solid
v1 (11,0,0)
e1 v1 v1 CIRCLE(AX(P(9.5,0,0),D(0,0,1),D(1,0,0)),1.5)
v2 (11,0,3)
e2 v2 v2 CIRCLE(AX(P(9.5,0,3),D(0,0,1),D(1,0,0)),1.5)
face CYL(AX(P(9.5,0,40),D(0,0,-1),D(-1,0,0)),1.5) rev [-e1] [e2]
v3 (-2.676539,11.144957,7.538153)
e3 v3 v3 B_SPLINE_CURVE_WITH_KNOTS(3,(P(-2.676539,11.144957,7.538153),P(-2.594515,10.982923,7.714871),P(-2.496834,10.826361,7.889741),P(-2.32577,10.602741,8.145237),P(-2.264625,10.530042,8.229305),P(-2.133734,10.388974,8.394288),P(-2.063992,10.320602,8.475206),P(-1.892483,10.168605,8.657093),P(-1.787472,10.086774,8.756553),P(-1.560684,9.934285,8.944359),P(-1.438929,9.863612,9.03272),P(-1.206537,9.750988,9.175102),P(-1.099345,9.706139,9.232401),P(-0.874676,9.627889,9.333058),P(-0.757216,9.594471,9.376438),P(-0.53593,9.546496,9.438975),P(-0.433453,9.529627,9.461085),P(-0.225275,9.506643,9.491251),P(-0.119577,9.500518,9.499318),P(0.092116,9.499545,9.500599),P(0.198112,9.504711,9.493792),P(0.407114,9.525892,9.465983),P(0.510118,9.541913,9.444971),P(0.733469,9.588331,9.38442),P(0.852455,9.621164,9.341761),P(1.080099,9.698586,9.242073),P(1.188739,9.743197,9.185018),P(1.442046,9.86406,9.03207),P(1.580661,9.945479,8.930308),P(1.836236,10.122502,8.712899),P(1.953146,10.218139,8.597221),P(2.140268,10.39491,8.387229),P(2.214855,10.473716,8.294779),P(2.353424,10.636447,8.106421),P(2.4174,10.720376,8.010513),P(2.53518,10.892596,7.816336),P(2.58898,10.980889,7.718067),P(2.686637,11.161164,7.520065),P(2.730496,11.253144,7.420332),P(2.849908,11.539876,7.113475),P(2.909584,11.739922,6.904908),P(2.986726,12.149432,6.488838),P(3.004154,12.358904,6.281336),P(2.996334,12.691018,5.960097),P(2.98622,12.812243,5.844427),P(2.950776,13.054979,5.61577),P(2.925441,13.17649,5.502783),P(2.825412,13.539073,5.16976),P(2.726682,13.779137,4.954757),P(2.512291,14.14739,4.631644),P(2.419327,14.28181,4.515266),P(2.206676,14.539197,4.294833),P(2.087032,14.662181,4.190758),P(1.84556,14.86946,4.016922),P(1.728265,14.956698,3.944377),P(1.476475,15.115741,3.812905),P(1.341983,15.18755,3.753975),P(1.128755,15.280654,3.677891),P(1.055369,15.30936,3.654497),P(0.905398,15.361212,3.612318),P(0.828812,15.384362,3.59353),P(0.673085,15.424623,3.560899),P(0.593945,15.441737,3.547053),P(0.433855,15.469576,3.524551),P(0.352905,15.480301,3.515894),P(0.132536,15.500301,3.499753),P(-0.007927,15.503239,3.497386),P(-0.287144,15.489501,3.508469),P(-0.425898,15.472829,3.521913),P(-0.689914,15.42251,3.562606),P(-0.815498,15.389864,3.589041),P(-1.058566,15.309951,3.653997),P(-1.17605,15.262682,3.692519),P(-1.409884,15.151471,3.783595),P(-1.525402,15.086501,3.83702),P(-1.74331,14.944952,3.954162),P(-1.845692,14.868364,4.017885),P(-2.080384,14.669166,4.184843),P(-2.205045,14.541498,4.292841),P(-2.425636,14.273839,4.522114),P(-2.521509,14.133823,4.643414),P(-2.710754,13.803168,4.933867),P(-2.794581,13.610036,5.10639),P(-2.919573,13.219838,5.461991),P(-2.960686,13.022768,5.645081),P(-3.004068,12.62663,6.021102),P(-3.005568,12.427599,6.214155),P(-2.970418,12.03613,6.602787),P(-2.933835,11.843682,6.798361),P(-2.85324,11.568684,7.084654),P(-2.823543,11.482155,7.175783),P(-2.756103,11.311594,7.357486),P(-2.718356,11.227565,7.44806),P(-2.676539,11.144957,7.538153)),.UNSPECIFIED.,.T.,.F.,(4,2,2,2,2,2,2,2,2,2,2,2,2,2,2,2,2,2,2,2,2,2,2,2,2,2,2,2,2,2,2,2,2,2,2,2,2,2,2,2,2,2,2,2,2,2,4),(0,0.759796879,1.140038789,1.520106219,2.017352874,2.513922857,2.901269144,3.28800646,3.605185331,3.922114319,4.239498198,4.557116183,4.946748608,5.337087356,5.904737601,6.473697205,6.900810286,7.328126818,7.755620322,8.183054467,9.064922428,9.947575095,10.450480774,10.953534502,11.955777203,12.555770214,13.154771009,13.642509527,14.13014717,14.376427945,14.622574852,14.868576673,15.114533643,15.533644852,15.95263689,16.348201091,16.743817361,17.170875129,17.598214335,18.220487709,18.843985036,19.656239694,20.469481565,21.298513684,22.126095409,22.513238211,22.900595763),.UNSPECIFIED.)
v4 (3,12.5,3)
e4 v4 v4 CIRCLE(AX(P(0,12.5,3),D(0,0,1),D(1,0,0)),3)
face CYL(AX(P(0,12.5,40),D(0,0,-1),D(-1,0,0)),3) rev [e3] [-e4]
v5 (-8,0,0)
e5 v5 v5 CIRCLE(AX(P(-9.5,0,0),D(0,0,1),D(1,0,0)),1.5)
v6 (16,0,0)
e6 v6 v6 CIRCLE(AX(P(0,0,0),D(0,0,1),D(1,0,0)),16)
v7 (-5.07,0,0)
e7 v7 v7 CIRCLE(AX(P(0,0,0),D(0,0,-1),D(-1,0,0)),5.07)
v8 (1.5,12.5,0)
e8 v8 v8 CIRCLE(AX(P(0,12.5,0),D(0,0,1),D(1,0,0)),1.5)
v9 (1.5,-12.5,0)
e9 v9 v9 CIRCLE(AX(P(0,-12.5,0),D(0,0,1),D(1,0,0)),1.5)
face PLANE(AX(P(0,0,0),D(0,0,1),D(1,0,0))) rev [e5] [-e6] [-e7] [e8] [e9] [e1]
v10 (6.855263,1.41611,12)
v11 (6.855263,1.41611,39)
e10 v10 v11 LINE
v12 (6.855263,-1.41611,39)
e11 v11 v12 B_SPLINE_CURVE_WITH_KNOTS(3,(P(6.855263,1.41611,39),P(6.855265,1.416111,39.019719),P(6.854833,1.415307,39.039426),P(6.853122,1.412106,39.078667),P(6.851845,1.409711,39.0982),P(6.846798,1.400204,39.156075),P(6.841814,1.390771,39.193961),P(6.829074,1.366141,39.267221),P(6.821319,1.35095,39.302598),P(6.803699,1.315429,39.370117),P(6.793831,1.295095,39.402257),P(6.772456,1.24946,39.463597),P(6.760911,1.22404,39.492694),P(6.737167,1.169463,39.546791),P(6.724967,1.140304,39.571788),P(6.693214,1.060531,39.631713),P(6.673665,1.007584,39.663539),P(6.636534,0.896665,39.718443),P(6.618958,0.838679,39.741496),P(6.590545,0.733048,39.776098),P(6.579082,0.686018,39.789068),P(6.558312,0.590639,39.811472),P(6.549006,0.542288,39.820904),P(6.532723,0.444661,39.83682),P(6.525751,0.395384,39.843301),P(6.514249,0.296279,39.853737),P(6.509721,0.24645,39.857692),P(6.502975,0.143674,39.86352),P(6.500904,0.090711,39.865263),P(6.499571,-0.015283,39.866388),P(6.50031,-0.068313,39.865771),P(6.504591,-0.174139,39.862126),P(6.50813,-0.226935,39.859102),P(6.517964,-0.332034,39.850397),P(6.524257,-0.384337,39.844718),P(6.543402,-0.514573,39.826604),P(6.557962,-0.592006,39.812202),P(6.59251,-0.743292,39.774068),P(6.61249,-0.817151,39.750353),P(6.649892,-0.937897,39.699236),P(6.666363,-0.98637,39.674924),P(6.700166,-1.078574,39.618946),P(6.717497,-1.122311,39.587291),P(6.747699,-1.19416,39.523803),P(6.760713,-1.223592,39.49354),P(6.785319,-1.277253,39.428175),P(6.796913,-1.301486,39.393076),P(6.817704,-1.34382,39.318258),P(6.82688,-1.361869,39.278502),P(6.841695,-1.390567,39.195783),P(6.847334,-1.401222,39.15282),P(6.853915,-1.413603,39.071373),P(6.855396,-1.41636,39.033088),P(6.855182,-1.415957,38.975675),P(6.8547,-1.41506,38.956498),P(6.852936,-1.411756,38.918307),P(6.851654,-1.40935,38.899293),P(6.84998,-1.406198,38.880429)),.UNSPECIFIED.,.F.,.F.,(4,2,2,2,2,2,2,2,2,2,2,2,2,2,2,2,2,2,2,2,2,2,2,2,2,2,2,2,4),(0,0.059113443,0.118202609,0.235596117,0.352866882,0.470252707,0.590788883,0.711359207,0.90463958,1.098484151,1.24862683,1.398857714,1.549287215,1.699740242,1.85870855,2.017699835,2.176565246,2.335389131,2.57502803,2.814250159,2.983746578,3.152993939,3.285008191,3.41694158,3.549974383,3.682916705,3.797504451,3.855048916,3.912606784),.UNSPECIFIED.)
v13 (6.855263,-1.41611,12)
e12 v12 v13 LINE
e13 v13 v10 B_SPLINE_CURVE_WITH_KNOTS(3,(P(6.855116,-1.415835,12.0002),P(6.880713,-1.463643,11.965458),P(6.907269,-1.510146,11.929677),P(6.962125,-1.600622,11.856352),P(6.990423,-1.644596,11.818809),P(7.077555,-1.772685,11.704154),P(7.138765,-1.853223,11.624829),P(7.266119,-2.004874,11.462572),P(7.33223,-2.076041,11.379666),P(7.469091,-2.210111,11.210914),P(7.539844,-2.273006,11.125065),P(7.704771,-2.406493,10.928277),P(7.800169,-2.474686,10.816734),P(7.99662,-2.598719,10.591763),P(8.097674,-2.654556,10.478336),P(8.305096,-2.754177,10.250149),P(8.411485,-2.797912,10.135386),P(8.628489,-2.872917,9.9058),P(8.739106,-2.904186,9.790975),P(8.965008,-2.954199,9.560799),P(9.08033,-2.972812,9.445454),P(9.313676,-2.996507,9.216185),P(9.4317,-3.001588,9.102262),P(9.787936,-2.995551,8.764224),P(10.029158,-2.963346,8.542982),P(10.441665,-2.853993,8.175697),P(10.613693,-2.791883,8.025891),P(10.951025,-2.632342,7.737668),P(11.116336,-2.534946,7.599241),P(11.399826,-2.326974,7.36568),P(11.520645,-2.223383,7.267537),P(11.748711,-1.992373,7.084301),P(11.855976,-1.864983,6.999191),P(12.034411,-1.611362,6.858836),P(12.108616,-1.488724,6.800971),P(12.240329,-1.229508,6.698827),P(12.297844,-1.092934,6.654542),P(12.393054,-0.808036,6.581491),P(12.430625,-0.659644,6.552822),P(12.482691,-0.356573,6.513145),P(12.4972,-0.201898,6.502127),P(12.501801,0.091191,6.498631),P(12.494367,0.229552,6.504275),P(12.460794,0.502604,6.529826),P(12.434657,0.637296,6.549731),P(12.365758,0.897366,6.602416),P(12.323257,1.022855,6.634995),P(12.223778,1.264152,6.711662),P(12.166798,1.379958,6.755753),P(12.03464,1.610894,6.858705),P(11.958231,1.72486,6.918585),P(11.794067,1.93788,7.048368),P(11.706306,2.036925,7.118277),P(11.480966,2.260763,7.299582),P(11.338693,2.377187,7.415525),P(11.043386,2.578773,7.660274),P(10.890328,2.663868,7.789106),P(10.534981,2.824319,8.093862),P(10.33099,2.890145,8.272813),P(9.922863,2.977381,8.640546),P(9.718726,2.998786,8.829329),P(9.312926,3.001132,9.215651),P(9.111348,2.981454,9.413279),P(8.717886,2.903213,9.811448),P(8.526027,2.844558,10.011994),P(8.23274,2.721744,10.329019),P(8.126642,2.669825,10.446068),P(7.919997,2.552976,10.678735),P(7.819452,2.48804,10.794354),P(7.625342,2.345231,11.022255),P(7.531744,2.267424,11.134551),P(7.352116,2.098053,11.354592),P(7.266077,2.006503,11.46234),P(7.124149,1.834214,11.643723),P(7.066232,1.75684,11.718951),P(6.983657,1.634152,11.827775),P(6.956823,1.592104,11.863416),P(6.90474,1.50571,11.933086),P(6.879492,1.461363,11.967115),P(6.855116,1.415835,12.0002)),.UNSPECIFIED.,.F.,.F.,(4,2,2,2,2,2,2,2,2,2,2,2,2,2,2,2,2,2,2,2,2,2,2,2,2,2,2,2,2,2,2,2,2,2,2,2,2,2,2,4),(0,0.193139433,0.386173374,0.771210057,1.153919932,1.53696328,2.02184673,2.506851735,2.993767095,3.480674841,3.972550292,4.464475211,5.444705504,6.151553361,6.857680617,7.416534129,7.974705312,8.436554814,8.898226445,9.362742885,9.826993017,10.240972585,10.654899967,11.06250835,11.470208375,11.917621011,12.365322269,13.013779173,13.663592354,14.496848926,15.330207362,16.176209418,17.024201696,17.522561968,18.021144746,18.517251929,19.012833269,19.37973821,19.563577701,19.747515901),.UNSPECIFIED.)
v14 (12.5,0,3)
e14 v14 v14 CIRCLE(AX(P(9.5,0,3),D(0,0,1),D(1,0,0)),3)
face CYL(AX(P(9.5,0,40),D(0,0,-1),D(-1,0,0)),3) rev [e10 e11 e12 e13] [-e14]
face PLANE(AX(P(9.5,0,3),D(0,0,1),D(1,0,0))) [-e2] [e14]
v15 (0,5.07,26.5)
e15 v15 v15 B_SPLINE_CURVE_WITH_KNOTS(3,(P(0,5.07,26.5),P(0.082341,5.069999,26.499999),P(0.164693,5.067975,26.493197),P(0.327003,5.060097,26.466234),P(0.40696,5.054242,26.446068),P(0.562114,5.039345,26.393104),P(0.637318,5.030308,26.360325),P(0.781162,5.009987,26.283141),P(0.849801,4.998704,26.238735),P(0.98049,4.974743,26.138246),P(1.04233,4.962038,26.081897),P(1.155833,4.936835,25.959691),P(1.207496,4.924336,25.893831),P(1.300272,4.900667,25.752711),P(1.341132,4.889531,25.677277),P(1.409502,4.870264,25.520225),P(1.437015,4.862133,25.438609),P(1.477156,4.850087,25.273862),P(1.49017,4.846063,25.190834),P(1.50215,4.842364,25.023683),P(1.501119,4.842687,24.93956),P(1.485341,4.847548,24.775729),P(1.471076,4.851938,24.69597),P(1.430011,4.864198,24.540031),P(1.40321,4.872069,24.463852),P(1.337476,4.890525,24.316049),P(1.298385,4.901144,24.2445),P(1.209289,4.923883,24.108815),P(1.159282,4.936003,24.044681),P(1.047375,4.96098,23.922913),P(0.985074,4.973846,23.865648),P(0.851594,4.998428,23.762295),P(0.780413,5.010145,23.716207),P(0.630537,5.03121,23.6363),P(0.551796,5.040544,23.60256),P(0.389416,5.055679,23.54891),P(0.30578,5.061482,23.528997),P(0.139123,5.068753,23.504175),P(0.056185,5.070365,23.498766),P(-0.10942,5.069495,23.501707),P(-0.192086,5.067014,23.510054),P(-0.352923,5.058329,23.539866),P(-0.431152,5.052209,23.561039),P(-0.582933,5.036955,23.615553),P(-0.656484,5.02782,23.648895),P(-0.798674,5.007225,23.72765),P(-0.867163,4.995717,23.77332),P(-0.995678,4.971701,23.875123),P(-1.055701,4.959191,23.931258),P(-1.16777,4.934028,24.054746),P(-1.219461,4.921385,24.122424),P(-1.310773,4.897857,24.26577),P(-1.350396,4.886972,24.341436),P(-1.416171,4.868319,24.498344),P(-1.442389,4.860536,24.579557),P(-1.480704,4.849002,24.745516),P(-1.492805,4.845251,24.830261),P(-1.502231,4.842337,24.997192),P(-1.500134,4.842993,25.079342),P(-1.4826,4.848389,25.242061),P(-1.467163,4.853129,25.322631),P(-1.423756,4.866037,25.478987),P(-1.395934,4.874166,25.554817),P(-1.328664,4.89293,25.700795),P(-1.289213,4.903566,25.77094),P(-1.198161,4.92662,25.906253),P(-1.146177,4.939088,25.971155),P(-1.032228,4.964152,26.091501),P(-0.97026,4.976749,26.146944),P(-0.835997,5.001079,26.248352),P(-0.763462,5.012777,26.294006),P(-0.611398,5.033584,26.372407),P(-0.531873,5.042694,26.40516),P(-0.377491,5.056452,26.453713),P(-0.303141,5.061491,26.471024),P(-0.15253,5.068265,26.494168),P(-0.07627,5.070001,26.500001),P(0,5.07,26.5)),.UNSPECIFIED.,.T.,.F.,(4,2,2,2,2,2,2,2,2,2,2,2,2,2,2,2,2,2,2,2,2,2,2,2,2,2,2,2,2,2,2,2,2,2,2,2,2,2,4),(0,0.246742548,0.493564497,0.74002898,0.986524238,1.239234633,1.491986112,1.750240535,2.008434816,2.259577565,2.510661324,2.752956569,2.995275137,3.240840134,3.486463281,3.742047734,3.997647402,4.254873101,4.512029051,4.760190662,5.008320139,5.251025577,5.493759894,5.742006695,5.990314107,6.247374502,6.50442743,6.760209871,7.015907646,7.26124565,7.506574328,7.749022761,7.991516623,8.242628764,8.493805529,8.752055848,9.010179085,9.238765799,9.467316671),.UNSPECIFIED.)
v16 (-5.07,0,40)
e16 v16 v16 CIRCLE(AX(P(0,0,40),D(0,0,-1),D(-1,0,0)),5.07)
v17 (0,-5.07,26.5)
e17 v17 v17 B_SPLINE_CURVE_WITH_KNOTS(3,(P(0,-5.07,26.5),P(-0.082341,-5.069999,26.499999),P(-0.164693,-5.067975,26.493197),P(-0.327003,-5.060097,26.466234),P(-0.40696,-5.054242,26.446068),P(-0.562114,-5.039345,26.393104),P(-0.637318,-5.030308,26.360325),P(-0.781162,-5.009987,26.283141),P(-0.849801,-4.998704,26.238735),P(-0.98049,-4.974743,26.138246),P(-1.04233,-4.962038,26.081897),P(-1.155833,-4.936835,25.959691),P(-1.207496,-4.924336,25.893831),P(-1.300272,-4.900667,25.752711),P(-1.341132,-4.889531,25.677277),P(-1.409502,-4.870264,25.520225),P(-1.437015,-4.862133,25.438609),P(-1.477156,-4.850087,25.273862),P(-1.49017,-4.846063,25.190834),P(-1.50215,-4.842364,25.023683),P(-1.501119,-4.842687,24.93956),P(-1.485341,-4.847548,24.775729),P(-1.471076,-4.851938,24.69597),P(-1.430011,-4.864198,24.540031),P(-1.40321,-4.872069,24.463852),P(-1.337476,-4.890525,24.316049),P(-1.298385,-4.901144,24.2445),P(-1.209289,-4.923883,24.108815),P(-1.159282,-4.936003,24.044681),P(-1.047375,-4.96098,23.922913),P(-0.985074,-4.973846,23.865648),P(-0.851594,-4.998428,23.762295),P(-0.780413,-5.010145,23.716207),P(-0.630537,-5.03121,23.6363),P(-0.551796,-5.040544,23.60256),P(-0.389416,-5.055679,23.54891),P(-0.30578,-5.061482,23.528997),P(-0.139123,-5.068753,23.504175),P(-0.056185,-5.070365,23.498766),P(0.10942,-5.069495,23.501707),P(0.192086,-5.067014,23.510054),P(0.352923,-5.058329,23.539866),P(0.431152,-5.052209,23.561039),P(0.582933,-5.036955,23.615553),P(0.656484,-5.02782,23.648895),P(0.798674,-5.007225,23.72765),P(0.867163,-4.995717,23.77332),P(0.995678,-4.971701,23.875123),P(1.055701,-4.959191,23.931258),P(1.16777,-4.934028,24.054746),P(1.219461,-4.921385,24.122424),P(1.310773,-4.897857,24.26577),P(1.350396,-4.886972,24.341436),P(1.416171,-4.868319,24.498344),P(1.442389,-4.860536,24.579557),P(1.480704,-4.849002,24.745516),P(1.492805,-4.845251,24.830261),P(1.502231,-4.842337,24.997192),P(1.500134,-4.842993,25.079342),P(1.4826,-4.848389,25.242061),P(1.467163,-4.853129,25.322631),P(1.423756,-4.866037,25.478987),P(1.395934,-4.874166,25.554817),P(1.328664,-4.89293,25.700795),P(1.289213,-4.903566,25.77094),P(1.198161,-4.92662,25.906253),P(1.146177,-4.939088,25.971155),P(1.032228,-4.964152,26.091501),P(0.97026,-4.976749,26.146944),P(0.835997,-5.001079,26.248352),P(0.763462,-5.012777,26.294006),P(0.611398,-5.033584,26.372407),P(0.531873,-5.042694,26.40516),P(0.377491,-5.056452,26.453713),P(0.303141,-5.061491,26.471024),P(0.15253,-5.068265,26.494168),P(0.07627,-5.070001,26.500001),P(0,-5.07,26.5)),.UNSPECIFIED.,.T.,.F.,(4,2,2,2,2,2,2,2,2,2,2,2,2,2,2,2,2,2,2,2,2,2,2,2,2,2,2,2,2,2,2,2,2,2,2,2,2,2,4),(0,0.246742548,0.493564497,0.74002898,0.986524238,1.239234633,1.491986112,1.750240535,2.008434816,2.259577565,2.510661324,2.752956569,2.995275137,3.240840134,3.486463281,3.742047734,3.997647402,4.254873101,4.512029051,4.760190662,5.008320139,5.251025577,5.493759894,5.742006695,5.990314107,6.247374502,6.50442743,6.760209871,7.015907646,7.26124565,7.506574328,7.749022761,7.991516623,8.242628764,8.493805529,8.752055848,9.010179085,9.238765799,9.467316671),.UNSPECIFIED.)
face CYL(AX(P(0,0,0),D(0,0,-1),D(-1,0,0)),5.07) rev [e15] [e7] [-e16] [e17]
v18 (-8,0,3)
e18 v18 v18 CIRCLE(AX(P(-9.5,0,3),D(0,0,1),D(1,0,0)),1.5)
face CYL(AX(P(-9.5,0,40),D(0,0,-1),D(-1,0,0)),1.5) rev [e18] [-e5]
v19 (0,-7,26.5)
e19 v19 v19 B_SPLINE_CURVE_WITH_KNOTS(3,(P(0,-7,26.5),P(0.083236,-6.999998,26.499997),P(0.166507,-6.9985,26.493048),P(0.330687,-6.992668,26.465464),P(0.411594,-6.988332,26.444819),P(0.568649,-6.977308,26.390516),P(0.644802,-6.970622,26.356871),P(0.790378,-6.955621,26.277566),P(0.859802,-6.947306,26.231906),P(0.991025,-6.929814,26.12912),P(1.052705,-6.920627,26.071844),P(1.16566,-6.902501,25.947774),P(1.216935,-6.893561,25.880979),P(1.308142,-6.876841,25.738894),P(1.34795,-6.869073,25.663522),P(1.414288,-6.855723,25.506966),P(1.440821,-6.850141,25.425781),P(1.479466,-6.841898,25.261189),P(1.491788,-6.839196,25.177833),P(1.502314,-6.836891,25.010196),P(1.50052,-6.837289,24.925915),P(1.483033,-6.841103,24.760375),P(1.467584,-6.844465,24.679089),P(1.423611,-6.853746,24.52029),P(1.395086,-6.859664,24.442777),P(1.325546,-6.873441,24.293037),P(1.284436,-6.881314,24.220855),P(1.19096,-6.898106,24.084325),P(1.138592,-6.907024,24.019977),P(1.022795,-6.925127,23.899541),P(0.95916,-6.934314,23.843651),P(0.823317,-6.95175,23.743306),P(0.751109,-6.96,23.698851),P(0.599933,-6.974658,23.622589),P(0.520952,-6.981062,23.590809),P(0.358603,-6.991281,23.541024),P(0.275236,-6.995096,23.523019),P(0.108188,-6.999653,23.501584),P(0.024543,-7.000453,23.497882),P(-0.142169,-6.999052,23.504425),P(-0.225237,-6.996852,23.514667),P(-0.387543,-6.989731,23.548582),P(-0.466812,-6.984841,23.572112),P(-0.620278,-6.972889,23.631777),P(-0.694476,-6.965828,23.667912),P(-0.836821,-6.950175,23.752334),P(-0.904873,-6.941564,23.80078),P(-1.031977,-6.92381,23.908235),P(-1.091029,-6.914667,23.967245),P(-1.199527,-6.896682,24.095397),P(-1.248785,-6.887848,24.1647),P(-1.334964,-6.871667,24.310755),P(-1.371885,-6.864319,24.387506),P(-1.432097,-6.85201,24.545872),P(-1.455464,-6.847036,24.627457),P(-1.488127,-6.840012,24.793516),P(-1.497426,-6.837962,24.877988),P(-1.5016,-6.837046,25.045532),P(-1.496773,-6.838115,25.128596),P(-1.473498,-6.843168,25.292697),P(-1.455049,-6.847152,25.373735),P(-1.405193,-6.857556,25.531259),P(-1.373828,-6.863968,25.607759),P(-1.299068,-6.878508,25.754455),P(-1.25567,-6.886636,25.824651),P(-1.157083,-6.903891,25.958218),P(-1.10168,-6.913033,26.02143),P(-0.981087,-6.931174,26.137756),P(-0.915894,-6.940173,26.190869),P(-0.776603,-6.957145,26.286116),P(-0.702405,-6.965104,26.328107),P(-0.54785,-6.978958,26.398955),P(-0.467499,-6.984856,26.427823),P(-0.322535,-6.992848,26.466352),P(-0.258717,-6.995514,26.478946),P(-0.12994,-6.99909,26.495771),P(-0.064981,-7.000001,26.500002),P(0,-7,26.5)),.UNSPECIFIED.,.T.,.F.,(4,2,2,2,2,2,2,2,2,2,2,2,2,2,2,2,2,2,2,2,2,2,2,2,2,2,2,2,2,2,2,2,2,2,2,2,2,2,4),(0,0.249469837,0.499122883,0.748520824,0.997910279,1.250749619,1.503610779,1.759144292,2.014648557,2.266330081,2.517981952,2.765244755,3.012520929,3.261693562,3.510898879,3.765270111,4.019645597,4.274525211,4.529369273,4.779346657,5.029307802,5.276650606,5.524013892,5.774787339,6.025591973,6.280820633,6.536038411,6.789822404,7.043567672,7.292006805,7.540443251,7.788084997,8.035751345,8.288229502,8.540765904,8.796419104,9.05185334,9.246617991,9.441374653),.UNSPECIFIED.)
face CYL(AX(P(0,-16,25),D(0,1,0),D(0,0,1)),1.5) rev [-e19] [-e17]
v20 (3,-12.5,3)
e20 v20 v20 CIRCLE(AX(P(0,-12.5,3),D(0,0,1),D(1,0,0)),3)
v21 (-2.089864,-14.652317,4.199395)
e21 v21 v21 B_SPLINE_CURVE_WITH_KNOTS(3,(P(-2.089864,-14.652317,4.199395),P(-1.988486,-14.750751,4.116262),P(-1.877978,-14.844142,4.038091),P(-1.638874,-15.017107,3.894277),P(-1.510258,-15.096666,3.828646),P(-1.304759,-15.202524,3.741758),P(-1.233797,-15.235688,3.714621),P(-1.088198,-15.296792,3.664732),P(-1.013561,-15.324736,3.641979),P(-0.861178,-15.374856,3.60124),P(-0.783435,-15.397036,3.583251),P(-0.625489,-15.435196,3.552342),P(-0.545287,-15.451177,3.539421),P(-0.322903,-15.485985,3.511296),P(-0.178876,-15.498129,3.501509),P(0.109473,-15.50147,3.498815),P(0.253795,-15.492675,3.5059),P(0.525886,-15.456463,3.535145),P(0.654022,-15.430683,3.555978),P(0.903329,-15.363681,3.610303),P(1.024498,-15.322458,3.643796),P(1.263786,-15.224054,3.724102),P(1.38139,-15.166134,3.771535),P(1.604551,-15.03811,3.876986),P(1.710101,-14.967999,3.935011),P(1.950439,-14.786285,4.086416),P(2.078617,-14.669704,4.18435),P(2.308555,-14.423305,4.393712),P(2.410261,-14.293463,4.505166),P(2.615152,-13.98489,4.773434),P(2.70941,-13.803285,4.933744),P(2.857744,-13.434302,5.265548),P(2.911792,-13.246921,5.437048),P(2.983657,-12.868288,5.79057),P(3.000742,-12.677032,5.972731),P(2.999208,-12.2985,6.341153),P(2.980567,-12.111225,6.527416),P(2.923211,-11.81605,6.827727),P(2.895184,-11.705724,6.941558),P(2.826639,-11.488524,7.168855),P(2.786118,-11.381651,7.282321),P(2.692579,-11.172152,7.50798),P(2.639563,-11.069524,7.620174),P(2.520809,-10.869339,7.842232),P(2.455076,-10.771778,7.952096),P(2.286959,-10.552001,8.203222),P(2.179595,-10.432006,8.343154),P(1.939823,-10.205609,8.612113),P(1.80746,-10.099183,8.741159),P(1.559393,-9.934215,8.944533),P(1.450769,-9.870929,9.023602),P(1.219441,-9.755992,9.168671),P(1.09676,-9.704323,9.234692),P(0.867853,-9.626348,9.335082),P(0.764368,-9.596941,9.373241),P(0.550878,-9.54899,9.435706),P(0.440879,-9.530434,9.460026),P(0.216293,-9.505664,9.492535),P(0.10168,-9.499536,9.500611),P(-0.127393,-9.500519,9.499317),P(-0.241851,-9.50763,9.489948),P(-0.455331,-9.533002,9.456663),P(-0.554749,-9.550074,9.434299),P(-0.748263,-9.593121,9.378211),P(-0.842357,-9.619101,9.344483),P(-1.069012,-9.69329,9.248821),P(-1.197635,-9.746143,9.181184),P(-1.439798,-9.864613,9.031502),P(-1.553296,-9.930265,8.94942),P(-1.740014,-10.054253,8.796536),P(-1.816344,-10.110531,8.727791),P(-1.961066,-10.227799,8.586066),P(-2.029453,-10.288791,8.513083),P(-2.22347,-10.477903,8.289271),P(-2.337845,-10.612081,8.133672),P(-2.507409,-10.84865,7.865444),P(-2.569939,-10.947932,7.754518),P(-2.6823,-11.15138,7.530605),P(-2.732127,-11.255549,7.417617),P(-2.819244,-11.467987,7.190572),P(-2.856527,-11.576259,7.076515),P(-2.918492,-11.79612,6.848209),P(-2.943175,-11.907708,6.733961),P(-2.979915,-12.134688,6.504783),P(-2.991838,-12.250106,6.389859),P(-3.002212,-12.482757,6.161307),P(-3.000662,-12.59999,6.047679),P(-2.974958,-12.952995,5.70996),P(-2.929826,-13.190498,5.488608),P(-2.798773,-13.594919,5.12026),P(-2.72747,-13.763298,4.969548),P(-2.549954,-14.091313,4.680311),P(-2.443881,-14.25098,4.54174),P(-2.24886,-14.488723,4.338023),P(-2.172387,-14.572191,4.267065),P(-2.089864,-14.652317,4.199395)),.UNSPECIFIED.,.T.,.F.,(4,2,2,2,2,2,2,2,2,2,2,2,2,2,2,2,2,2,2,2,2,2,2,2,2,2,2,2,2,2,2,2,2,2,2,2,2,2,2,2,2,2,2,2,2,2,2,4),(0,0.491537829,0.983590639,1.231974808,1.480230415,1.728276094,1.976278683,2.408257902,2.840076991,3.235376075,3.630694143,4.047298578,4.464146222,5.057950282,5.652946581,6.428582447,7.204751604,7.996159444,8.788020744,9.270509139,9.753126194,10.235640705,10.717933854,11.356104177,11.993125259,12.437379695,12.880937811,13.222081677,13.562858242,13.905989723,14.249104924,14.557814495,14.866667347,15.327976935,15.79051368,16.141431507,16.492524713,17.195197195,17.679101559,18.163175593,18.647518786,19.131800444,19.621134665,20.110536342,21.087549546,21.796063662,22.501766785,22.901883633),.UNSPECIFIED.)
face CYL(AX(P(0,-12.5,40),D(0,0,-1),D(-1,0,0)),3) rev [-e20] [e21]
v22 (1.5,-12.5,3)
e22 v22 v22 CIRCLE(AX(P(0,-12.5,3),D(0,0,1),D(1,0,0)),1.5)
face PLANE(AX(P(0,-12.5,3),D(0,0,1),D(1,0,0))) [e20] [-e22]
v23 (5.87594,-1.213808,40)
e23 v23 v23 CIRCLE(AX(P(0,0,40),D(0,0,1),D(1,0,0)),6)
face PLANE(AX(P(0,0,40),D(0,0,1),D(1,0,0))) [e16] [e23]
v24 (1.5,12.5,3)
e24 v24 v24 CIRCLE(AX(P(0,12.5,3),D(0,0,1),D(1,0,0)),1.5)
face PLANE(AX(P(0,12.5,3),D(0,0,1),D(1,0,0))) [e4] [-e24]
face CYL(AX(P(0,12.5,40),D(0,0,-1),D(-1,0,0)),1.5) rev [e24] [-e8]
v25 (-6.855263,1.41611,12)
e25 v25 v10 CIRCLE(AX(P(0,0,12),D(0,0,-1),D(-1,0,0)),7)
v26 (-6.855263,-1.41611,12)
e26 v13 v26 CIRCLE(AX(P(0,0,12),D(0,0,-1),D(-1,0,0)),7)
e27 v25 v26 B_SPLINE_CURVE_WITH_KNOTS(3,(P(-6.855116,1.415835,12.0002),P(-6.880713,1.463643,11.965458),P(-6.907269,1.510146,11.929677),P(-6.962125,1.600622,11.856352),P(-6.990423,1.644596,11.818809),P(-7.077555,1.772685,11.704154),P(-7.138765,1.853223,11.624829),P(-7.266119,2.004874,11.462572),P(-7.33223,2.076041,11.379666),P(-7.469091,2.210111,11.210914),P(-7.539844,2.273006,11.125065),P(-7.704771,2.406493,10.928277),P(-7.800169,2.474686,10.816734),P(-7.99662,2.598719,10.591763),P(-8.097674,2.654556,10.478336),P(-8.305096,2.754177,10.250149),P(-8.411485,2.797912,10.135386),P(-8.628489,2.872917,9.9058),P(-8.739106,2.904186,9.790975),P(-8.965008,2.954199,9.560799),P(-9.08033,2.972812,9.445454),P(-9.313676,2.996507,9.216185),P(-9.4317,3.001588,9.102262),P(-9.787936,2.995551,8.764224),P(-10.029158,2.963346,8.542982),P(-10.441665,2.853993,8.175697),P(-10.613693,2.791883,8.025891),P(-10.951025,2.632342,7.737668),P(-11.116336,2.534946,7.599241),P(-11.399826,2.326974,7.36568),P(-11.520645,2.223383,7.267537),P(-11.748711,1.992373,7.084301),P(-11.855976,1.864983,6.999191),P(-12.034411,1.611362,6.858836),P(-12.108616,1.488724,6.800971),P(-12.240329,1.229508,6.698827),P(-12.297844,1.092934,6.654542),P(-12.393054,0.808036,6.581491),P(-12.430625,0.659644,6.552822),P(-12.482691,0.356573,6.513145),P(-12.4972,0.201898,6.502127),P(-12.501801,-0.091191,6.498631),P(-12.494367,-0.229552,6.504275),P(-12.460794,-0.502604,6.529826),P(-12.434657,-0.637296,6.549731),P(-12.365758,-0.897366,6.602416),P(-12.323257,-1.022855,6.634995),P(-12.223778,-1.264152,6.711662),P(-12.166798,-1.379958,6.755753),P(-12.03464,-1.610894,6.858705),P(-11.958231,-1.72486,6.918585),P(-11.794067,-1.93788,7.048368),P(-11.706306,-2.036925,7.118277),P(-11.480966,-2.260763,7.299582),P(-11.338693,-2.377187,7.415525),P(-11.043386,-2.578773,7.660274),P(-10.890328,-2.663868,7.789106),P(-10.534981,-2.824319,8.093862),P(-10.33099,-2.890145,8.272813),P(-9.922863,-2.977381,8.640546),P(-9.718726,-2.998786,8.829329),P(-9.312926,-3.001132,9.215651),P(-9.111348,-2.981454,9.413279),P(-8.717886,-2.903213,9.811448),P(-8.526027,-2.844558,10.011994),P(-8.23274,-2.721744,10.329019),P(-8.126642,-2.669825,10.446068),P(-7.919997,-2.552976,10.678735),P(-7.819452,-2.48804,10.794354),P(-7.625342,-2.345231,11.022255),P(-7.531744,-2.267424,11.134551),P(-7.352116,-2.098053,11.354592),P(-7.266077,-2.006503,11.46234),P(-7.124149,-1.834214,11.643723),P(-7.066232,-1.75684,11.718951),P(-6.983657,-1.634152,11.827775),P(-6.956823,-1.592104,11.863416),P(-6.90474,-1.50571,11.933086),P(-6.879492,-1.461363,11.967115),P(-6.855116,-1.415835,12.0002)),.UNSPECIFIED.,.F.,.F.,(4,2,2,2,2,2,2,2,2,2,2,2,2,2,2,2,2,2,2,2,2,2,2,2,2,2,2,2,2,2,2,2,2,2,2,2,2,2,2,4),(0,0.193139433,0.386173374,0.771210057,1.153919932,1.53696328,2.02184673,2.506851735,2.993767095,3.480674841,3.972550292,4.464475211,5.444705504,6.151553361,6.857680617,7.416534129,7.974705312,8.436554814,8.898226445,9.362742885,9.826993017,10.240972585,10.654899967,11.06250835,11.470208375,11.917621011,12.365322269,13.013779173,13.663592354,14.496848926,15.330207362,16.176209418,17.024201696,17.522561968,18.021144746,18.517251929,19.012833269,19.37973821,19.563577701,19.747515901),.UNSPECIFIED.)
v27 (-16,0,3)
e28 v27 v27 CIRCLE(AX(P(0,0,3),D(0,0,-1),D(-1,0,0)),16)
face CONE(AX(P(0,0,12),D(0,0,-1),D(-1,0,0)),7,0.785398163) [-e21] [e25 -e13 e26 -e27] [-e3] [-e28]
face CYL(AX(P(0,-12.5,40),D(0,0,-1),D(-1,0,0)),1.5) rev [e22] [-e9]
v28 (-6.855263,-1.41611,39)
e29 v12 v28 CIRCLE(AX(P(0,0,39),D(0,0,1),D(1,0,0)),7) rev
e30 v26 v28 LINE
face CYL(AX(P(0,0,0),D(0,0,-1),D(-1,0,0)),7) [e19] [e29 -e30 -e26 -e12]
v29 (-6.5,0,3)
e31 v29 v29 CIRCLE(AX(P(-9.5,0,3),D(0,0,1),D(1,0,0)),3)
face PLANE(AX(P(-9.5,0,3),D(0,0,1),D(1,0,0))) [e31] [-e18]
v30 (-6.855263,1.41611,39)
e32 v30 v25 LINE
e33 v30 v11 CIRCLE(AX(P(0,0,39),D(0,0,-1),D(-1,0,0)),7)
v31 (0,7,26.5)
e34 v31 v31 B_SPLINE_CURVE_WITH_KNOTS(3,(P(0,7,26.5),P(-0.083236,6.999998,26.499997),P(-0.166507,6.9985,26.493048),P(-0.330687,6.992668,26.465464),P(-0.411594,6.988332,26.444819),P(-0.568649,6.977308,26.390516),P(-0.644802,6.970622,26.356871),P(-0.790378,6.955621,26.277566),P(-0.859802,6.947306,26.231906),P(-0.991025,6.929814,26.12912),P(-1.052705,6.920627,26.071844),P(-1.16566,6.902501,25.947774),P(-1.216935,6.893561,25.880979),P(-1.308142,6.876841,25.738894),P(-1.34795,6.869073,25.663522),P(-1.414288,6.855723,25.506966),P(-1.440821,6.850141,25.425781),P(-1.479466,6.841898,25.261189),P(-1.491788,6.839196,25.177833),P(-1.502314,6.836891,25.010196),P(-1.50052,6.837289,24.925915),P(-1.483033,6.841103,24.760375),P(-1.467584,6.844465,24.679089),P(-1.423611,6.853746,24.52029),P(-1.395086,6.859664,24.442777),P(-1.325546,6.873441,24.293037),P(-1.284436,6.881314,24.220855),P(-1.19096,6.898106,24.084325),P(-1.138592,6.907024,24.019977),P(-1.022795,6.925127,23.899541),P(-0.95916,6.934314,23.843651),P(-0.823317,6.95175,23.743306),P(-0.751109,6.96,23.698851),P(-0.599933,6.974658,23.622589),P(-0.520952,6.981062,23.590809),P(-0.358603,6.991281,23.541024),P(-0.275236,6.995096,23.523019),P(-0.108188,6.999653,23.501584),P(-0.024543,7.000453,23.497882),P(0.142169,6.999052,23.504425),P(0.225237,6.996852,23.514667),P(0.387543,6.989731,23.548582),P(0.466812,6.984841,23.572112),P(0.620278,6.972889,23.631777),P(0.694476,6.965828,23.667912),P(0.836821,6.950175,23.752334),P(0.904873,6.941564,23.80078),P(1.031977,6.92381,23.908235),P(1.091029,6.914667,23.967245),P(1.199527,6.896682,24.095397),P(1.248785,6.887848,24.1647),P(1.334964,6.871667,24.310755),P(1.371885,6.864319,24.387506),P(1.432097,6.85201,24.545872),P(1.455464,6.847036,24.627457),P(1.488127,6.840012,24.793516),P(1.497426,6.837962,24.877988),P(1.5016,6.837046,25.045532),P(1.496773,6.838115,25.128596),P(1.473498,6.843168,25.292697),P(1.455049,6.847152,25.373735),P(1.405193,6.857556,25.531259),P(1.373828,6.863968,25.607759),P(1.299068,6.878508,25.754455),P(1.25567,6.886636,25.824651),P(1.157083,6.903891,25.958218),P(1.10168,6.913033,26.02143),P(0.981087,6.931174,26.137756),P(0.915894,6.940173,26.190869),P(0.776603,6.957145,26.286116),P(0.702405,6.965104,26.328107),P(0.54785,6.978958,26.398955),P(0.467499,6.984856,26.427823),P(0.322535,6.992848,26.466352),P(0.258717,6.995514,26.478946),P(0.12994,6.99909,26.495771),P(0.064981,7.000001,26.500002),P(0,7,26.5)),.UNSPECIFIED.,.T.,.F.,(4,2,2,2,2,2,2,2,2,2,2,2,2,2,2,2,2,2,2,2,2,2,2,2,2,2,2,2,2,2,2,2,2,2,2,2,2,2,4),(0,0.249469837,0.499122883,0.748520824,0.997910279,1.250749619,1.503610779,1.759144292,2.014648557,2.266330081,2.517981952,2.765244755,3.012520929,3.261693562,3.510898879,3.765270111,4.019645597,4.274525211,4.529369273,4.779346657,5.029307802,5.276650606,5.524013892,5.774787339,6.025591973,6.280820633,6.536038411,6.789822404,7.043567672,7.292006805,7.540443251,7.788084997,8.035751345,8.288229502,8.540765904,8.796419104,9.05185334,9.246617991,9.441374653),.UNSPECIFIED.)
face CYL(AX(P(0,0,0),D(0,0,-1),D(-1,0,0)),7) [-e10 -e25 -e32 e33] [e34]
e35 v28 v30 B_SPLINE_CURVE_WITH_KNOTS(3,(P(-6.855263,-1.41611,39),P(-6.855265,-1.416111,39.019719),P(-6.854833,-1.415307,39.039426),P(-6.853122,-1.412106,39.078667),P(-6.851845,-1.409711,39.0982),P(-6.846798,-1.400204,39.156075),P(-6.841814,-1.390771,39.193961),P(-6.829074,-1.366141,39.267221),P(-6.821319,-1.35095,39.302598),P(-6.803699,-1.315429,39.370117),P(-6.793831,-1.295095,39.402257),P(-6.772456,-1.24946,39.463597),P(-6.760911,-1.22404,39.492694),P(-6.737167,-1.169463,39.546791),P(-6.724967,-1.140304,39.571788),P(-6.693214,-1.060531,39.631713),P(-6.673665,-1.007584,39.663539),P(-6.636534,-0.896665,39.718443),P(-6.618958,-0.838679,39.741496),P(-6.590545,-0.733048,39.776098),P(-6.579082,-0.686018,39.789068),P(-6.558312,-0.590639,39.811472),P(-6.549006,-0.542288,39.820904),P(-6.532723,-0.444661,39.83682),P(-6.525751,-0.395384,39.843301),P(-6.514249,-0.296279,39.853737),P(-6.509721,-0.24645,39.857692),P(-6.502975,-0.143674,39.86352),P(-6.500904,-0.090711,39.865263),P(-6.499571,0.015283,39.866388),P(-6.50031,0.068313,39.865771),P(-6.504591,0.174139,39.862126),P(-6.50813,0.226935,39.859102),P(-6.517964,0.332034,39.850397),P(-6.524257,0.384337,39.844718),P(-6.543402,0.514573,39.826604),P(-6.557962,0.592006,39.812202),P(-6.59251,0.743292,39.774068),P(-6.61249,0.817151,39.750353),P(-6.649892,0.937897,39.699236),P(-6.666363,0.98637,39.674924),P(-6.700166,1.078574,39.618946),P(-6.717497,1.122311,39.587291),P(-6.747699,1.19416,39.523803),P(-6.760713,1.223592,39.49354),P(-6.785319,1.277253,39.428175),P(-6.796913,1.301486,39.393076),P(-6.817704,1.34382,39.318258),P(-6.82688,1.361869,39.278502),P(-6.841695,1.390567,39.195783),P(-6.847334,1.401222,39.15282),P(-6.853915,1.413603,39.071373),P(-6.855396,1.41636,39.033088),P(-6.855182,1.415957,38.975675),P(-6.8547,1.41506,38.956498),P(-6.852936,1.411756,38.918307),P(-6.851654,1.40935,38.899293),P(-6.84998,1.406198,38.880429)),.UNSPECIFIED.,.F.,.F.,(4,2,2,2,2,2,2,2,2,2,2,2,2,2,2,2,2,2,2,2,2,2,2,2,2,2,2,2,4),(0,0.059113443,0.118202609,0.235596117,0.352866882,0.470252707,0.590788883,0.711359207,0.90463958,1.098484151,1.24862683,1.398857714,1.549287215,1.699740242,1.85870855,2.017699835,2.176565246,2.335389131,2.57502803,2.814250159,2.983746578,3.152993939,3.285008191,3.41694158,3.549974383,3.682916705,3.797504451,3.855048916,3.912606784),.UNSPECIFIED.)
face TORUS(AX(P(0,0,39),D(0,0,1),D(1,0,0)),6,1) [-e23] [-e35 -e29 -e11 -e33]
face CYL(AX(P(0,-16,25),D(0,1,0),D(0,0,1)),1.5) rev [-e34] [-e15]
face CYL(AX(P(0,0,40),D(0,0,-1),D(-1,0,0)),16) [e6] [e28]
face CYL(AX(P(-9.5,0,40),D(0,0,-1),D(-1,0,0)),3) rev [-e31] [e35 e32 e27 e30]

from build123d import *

# Parameters (mm, degrees)
SKETCH_1_R               = 16
EXTRUDE_1_DEPTH          = 40
SKETCH_2_W               = 5.07
SKETCH_2_H               = 40
SKETCH_3_R               = 1.5
CUT_EXTRUDE_2_DEPTH      = 46.956501172
SKETCH_4_R               = 3
SKETCH_4_R_2             = 1.5
CUT_EXTRUDE_3_DEPTH      = 44.370496958
CUT_EXTRUDE_4_DEPTH      = 46.956501329
CUT_EXTRUDE_4_DEPTH_BACK = 46.956501329
SKETCH_5_R               = 1.5


with BuildPart() as part:
    # 草图1 → 凸台-拉伸1 (new body)
    with BuildSketch(Plane.XY):
        Circle(SKETCH_1_R)
    extrude(amount=EXTRUDE_1_DEPTH)

    # 草图2 → 切除-旋转1 (revolve, cut)
    with BuildSketch(Plane(origin=(0, 0, 0), x_dir=(1, 0, 0), z_dir=(0, 1, 0))):
        Polygon((-16, -40), (-16, -3), (-7, -12), (-7, -40), align=None)
        with Locations((-2.535, -20)):
            Rectangle(SKETCH_2_W, SKETCH_2_H)
    revolve(axis=Axis((0, 0, 0), (0, 0, 1)), mode=Mode.SUBTRACT)

    # 草图3 → 切除-拉伸2 (cut, through all)
    with BuildSketch(Plane.XY):
        with Locations(Location((0, -12.5, 0), (0, 0, 237.240983175))):
            Circle(SKETCH_3_R)
        with Locations(Location((-9.5, 0, 0), (0, 0, 179.999999805))):
            Circle(SKETCH_3_R)
        with Locations(Location((9.5, 0, 0), (0, 0, 259.790179824))):
            Circle(SKETCH_3_R)
        with Locations(Location((0, 12.5, 0), (0, 0, 122.759016825))):
            Circle(SKETCH_3_R)
    extrude(amount=CUT_EXTRUDE_2_DEPTH, mode=Mode.SUBTRACT)

    # 草图4 → 切除-拉伸3 (cut, through all)
    # profile 1 of 4: a face of its own
    with BuildSketch(Plane.XY.offset(3)):
        with Locations(Location((0, 12.5, 0), (0, 0, 206.851583032))):
            Circle(SKETCH_4_R)
        with Locations((0, 12.5)):
            Circle(SKETCH_4_R_2, mode=Mode.SUBTRACT)
    # profile 2 of 4: a face of its own
    with BuildSketch(Plane.XY.offset(3)):
        with Locations(Location((-9.5, 0, 0), (0, 0, 179.999999996))):
            Circle(SKETCH_4_R)
        with Locations((-9.5, 0)):
            Circle(SKETCH_4_R_2, mode=Mode.SUBTRACT)
    # profile 3 of 4: a face of its own
    with BuildSketch(Plane.XY.offset(3)):
        with Locations(Location((9.5, 0, 0), (0, 0, 208.166578237))):
            Circle(SKETCH_4_R)
        with Locations((9.5, 0)):
            Circle(SKETCH_4_R_2, mode=Mode.SUBTRACT)
    # profile 4 of 4: a face of its own
    with BuildSketch(Plane.XY.offset(3)):
        with Locations(Location((0, -12.5, 0), (0, 0, 225.843438768))):
            Circle(SKETCH_4_R)
        with Locations((0, -12.5)):
            Circle(SKETCH_4_R_2, mode=Mode.SUBTRACT)
    extrude(amount=CUT_EXTRUDE_3_DEPTH, mode=Mode.SUBTRACT)

    # 草图5 → 切除-拉伸4 (cut, two sides: drawn at the far end of the back side and taken through both)
    with BuildSketch(Plane(origin=(0, 0, 0), x_dir=(1, 0, 0), z_dir=(0, 1, 0)).offset(-CUT_EXTRUDE_4_DEPTH_BACK)):
        with Locations(Location((0, -25, 0), (0, 0, 270))):
            Circle(SKETCH_5_R)
    extrude(amount=CUT_EXTRUDE_4_DEPTH + CUT_EXTRUDE_4_DEPTH_BACK, mode=Mode.SUBTRACT)

    # 圆角1: read off the stored shape, not the designer's step
    # 圆角1 outline → 圆角1 (revolve, cut)
    with BuildSketch(Plane.XZ):
        with BuildLine():
            ThreePointArc((6, 40), (6.707106781, 39.707106781), (7, 39))
            Line((7, 39), (7, 40))
            Line((7, 40), (6, 40))
        make_face()
    revolve(axis=Axis((0, 0, 0), (0, 0, 1)), mode=Mode.SUBTRACT)


solid = part.part
